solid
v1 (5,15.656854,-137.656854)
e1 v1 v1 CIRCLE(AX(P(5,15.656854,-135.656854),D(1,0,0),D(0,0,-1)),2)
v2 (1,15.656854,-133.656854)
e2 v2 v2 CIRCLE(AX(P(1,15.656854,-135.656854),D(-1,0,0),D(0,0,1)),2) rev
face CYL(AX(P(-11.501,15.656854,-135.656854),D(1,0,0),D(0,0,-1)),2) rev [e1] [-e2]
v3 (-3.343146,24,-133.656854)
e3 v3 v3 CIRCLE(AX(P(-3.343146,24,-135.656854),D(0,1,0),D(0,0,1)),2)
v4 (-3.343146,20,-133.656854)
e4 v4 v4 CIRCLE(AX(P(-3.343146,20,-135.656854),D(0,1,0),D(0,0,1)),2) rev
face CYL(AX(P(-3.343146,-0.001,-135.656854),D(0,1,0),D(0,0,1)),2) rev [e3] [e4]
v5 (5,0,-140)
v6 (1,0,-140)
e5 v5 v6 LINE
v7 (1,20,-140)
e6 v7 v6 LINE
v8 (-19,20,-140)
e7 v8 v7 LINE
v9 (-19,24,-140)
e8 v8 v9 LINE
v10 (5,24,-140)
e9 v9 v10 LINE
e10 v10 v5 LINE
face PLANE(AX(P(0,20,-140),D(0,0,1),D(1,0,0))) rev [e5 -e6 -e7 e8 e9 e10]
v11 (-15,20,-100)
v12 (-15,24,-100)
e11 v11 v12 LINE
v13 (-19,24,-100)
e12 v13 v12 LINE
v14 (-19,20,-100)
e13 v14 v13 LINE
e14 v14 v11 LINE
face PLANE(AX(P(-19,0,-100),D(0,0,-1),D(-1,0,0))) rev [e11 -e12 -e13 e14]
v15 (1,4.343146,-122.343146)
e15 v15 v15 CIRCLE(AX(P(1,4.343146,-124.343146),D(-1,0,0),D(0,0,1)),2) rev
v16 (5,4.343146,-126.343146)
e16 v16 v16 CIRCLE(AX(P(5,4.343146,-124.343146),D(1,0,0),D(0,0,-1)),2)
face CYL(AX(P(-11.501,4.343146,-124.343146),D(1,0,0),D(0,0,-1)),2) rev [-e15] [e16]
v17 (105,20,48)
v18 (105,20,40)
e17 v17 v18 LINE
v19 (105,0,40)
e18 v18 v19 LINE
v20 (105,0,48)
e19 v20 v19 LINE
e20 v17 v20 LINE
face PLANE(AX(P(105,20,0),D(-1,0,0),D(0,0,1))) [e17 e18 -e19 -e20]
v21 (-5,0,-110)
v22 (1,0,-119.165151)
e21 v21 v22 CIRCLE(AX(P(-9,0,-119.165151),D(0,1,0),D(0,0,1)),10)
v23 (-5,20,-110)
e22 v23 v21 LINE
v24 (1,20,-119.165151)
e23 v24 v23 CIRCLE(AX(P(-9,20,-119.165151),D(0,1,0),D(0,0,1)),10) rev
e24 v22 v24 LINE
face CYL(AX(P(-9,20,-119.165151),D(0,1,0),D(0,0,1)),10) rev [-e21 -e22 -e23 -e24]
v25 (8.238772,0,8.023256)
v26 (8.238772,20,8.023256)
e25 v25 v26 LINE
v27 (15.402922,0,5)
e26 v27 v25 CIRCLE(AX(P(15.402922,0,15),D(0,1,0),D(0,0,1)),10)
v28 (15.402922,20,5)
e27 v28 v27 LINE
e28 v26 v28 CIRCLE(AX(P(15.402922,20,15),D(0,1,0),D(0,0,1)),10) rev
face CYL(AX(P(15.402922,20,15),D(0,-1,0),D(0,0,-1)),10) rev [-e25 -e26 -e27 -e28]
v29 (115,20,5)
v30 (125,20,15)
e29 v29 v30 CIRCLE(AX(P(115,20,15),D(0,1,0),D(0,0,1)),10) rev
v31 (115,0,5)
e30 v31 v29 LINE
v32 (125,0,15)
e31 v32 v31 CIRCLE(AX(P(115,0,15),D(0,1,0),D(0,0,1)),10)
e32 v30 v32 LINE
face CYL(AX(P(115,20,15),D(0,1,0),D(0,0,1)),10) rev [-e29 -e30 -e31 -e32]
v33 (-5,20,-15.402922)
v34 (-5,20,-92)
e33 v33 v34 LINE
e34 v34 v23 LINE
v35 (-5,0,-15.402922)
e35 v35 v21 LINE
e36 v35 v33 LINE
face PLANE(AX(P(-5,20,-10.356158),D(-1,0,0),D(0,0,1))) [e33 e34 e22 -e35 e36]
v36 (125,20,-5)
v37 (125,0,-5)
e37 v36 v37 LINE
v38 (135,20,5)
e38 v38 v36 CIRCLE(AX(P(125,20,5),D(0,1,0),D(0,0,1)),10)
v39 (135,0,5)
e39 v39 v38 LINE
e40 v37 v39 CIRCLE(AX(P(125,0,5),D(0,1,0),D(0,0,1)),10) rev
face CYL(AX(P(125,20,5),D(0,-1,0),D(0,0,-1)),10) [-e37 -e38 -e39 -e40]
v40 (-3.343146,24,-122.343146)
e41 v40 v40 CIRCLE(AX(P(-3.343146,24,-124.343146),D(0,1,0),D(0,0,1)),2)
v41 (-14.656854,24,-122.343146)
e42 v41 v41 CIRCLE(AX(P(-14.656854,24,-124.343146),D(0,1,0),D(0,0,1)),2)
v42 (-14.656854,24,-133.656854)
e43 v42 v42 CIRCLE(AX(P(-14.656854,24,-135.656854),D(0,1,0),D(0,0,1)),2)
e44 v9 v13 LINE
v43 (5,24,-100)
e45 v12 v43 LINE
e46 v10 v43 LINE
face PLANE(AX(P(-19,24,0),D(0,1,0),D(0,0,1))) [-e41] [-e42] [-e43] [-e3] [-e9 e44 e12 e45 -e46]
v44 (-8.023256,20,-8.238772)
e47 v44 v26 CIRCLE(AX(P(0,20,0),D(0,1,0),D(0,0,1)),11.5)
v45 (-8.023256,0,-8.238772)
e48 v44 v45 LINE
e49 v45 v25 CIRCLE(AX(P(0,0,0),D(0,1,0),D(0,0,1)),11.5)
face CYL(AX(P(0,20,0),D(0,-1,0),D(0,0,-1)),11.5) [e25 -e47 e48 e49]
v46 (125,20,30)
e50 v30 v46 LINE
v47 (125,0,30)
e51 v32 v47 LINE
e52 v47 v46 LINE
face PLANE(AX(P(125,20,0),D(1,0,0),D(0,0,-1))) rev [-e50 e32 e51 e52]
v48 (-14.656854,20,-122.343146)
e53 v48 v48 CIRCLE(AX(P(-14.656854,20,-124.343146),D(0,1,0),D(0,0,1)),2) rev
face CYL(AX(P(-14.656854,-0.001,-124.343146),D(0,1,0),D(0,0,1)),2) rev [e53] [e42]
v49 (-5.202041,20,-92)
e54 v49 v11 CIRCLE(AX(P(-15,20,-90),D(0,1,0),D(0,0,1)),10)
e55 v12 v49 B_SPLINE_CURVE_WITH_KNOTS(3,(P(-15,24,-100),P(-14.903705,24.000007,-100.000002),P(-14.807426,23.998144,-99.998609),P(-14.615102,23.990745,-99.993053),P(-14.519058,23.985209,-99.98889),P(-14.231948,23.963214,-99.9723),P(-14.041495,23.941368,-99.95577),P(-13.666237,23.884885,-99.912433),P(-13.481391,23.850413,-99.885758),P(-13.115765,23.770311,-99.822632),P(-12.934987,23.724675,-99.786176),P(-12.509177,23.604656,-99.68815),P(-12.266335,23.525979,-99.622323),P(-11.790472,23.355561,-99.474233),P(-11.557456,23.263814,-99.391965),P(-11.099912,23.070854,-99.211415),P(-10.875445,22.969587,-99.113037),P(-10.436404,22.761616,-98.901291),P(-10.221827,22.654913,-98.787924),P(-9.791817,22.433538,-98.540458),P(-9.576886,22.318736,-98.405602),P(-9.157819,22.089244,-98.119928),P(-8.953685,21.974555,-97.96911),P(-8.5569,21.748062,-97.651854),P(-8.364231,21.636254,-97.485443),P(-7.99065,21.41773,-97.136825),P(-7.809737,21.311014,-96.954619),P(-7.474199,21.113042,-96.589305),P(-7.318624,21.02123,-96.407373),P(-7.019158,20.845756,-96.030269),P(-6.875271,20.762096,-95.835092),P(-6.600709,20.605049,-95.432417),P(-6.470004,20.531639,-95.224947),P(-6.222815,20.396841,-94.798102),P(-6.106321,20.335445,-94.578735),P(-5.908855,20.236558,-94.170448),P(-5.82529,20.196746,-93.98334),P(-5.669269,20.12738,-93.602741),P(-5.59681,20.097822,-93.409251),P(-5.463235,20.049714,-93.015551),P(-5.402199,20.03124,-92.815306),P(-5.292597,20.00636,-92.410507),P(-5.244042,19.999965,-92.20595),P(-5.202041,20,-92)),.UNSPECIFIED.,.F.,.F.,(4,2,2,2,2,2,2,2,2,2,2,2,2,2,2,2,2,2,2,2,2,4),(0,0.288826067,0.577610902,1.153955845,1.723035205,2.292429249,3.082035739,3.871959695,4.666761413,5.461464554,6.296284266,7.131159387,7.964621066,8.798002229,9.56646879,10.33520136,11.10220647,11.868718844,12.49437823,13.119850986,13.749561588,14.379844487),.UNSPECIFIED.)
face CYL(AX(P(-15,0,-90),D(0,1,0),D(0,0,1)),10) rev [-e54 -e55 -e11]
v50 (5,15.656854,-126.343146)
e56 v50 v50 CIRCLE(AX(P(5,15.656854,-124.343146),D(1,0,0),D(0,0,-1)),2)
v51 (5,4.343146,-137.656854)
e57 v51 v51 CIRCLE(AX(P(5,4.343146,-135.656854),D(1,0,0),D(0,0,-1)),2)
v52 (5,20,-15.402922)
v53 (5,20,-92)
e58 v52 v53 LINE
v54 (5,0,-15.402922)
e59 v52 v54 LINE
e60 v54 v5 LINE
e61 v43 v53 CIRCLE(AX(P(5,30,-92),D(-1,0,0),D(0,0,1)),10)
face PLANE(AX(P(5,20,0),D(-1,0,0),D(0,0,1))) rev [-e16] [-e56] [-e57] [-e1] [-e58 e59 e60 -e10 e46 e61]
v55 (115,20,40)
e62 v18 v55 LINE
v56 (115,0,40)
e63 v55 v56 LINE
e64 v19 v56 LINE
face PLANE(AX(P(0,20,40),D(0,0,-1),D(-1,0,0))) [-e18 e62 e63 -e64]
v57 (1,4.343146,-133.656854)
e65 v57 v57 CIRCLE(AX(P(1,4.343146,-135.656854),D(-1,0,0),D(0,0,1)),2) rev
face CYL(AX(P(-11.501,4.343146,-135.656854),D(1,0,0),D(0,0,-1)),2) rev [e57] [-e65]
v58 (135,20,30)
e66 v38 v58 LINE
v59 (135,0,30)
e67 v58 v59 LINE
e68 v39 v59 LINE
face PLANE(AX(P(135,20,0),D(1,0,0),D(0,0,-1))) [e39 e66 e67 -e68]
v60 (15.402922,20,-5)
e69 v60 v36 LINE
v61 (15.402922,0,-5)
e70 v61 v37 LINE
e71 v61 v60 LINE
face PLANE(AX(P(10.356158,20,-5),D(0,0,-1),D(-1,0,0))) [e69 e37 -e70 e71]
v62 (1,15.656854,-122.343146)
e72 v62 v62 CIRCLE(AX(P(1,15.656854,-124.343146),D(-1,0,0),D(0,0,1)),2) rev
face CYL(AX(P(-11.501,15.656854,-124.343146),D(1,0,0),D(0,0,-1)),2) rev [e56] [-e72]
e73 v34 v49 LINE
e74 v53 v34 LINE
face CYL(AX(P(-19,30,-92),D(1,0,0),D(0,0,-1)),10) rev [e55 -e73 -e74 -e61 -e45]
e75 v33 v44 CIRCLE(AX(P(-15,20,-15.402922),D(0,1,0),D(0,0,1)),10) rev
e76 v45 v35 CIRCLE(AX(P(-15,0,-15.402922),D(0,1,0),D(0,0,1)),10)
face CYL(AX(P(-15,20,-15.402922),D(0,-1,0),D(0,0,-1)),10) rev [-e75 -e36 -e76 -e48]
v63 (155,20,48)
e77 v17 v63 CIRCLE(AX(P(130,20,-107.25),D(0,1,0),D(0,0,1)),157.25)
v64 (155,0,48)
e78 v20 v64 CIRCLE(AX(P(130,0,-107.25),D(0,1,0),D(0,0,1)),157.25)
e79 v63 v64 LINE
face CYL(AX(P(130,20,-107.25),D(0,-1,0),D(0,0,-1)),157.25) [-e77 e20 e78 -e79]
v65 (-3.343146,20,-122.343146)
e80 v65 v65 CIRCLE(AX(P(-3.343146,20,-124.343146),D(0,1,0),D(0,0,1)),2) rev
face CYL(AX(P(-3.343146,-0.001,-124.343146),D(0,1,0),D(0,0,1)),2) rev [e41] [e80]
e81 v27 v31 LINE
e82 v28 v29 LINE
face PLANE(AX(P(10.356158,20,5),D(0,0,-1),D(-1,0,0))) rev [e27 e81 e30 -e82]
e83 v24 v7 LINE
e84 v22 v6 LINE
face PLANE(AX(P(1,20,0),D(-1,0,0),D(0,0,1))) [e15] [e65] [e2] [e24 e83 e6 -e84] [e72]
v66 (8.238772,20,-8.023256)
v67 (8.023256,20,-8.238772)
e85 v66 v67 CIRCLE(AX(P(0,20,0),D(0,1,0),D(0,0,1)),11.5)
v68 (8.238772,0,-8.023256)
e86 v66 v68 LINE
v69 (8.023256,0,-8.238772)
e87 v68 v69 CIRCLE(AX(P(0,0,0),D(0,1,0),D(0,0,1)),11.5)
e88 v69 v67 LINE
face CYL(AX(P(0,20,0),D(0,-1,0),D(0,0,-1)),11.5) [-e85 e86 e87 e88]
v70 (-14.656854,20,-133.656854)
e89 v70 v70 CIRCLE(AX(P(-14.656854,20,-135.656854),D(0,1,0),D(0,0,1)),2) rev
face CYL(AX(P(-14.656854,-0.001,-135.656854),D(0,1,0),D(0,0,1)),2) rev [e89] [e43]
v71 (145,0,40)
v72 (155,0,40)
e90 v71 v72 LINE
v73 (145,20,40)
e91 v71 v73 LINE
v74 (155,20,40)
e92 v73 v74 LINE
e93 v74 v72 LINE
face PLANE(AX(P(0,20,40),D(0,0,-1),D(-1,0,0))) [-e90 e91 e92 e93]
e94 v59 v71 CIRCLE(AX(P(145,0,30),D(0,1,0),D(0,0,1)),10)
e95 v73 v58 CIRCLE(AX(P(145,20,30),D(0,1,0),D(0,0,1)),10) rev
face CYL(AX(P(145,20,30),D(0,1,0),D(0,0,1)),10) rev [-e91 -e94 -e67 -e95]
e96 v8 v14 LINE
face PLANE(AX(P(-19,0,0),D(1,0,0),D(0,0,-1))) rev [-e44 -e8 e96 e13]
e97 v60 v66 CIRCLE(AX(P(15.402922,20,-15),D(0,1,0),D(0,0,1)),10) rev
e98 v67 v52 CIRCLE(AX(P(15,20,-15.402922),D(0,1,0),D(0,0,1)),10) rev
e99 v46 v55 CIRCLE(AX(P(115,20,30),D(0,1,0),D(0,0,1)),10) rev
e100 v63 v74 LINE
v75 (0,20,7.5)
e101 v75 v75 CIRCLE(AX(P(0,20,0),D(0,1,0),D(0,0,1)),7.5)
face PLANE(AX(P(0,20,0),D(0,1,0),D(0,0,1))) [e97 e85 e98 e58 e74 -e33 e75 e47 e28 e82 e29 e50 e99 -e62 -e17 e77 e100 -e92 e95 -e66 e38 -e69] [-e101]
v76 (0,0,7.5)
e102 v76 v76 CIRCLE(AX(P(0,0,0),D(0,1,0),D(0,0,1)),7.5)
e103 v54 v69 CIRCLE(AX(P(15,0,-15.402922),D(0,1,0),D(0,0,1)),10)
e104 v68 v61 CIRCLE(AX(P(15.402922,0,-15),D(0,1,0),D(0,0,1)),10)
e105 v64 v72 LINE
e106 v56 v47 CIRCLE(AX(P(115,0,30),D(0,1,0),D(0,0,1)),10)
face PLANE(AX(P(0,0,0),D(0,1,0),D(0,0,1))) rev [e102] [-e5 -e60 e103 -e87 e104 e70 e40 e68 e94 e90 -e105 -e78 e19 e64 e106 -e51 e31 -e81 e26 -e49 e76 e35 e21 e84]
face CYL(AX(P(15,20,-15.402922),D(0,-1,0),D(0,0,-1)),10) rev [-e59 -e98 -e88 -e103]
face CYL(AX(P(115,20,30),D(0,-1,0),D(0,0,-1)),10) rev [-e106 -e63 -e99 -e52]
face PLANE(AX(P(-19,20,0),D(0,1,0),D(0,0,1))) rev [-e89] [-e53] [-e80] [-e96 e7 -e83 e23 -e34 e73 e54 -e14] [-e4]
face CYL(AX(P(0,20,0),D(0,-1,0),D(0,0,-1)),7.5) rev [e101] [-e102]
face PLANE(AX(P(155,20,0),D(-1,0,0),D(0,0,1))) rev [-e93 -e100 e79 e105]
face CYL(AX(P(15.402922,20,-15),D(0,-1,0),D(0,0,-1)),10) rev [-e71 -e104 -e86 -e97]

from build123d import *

# Parameters (mm, degrees)
SKETCH1_R           = 7.5
BOSS_EXTRUDE1_DEPTH = 20
CUT_EXTRUDE1_REACH  = 208.155
SKETCH2_R           = 2
FILLET1_R           = 10
SKETCH3_W           = 40
SKETCH3_H           = 4
BOSS_EXTRUDE2_DEPTH = 24
CUT_EXTRUDE2_REACH  = 212.24
SKETCH4_R           = 2
FILLET3_R           = 10
FILLET4_START       = -5.202040929
FILLET4_DEPTH       = 6.202040929
FILLET4_START_2     = -14.898418687
FILLET4_2_DEPTH     = 9.696377758
FILLET4_START_3     = 20
FILLET4_3_DEPTH     = 5


with BuildPart() as part:
    # Sketch1 → Boss-Extrude1 (new body)
    with BuildSketch(Plane(origin=(0, 0, 0), x_dir=(1, 0, 0), z_dir=(0, 1, 0))):
        with BuildLine():
            Line((10.356157589, -5), (125, -5))
            Line((125, -5), (125, -40))
            Line((125, -40), (105, -40))
            Line((105, -40), (105, -48))
            ThreePointArc((105, -48), (130, -50), (155, -48))
            Line((155, -48), (155, -40))
            Line((155, -40), (135, -40))
            Line((135, -40), (135, 5))
            Line((135, 5), (10.356157589, 5))
            ThreePointArc((10.356157589, 5), (8.131727984, 8.131727984), (5, 10.356157589))
            Line((5, 10.356157589), (5, 140))
            Line((5, 140), (1, 140))
            Line((1, 140), (1, 110))
            Line((1, 110), (-5, 110))
            Line((-5, 110), (-5, 10.356157589))
            ThreePointArc((-5, 10.356157589), (-8.131727984, -8.131727984), (10.356157589, -5))
        make_face()
        with Locations(Location((0, 0, 0), (0, 0, 270))):
            Circle(SKETCH1_R, mode=Mode.SUBTRACT)
    extrude(amount=BOSS_EXTRUDE1_DEPTH)

    # Sketch2 → Cut-Extrude1 (cut, up to next)
    with BuildSketch(Plane(origin=(5, 0, 0), x_dir=(0, 0, -1), z_dir=(1, 0, 0)), mode=Mode.PRIVATE) as cut_extrude1_sk1:
        with Locations((135.656854249, 4.343145751)):
            Circle(SKETCH2_R)
    cut_extrude1_tool1 = extrude(cut_extrude1_sk1.sketch, amount=-CUT_EXTRUDE1_REACH, mode=Mode.PRIVATE) & part.part
    # Sketch2 → Cut-Extrude1 (cut, up to next)
    with BuildSketch(Plane(origin=(5, 0, 0), x_dir=(0, 0, -1), z_dir=(1, 0, 0)), mode=Mode.PRIVATE) as cut_extrude1_sk2:
        with Locations((124.343145751, 4.343145751)):
            Circle(SKETCH2_R)
    cut_extrude1_tool2 = extrude(cut_extrude1_sk2.sketch, amount=-CUT_EXTRUDE1_REACH, mode=Mode.PRIVATE) & part.part
    # Sketch2 → Cut-Extrude1 (cut, up to next)
    with BuildSketch(Plane(origin=(5, 0, 0), x_dir=(0, 0, -1), z_dir=(1, 0, 0)), mode=Mode.PRIVATE) as cut_extrude1_sk3:
        with Locations((124.343145751, 15.656854249)):
            Circle(SKETCH2_R)
    cut_extrude1_tool3 = extrude(cut_extrude1_sk3.sketch, amount=-CUT_EXTRUDE1_REACH, mode=Mode.PRIVATE) & part.part
    # Sketch2 → Cut-Extrude1 (cut, up to next)
    with BuildSketch(Plane(origin=(5, 0, 0), x_dir=(0, 0, -1), z_dir=(1, 0, 0)), mode=Mode.PRIVATE) as cut_extrude1_sk4:
        with Locations((135.656854249, 15.656854249)):
            Circle(SKETCH2_R)
    cut_extrude1_tool4 = extrude(cut_extrude1_sk4.sketch, amount=-CUT_EXTRUDE1_REACH, mode=Mode.PRIVATE) & part.part
    add(cut_extrude1_tool1.solids().sort_by_distance((5, 4.343146, -135.656854))[0], mode=Mode.SUBTRACT)
    add(cut_extrude1_tool2.solids().sort_by_distance((5, 4.343146, -124.343146))[0], mode=Mode.SUBTRACT)
    add(cut_extrude1_tool3.solids().sort_by_distance((5, 15.656854, -124.343146))[0], mode=Mode.SUBTRACT)
    add(cut_extrude1_tool4.solids().sort_by_distance((5, 15.656854, -135.656854))[0], mode=Mode.SUBTRACT)

    # Fillet1
    # the kernel refuses this fillet: 10 mm, written as the material it adds along each edge
    with BuildSketch(Plane(origin=(1, 0, -110), x_dir=(0, 0, -1), z_dir=(0, 1, 0))) as fillet1_piece_1:
        with BuildLine():
            CenterArc((9.16515139, 10), FILLET1_R, 203.578178478, 66.421821522)
            Line((0, 6), (0, 0))
            Line((0, 0), (9.16515139, 0))
        make_face()
    extrude(amount=20)
    with BuildSketch(Plane(origin=(125, 0, 40), x_dir=(0, 0, -1), z_dir=(0, 1, 0)), Plane(origin=(135, 0, 40), x_dir=(1, 0, 0), z_dir=(0, 1, 0)), Plane(origin=(125, 0, 5), x_dir=(-1, 0, 0), z_dir=(0, 1, 0))) as fillet1_piece_2:
        with BuildLine():
            CenterArc((FILLET1_R, FILLET1_R), FILLET1_R, 180, 90)
            Line((0, FILLET1_R), (0, 0))
            Line((0, 0), (FILLET1_R, 0))
        make_face()
    extrude(amount=20)
    with BuildSketch(Plane(origin=(10.356157589, 0, 5), x_dir=(1, 0, 0), z_dir=(0, 1, 0))) as fillet1_piece_3:
        with BuildLine():
            CenterArc((5.046764212, -10), FILLET1_R, 90, 45.75928121)
            ThreePointArc((-2.117385463, -3.023255814), (-0.936610269, -1.597130308), (0, 0))
            Line((0, 0), (5.046764212, 0))
        make_face()
    extrude(amount=20)
    with BuildSketch(Plane(origin=(10.356157589, 0, -5), x_dir=(1, 0, 0), z_dir=(0, 1, 0))) as fillet1_piece_4:
        with BuildLine():
            CenterArc((5.046764212, 10), FILLET1_R, 224.24071879, 45.75928121)
            ThreePointArc((-2.117385463, 3.023255814), (-0.936610269, 1.597130308), (0, 0))
            Line((0, 0), (5.046764212, 0))
        make_face()
    extrude(amount=20)
    with BuildSketch(Plane(origin=(5, 0, -10.356157589), x_dir=(0.8190910712491061, 0, 0.5736635050271124), z_dir=(0, 1, 0))) as fillet1_piece_5:
        with BuildLine():
            CenterArc((5.295766266, 9.870394555), FILLET1_R, 215.006090265, 45.75928121)
            Line((-2.895144447, 4.133759505), (0, 0))
            ThreePointArc((0, 0), (1.845494305, 0.149046262), (3.690988609, 0))
        make_face()
    extrude(amount=20)
    with BuildSketch(Plane(origin=(-5, 0, -10.356157589), x_dir=(-0.8190910712491065, 0, 0.5736635050271119), z_dir=(0, 1, 0))) as fillet1_piece_6:
        with BuildLine():
            CenterArc((5.295766266, -9.870394555), FILLET1_R, 99.234628525, 45.75928121)
            Line((-2.895144447, -4.133759505), (0, 0))
            ThreePointArc((0, 0), (1.845494305, -0.149046262), (3.690988609, 0))
        make_face()
    extrude(amount=20)
    # the kernel refuses this fillet: 10 mm, written as the material it takes off along each edge
    with BuildSketch(Plane(origin=(135, -25, -5), x_dir=(0, 0, 1), z_dir=(0, 1, 0))) as fillet1_2_piece_1:
        with BuildLine():
            CenterArc((FILLET1_R, -FILLET1_R), FILLET1_R, 90, 90)
            Line((0, -FILLET1_R), (0, 0))
            Line((0, 0), (FILLET1_R, 0))
        make_face()
    extrude(amount=70, mode=Mode.SUBTRACT)

    # Sketch3 → Boss-Extrude2 (add)
    with BuildSketch(Plane(origin=(5, 0, 0), x_dir=(0, 0, -1), z_dir=(1, 0, 0))):
        with Locations((120, 22)):
            Rectangle(SKETCH3_W, SKETCH3_H)
    extrude(amount=-BOSS_EXTRUDE2_DEPTH)

    # Sketch4 → Cut-Extrude2 (cut, up to next)
    with BuildSketch(Plane(origin=(0, 24, 0), x_dir=(1, 0, 0), z_dir=(0, 1, 0)), mode=Mode.PRIVATE) as cut_extrude2_sk1:
        with Locations(Location((-3.343145751, 135.656854249, 0), (0, 0, 270))):
            Circle(SKETCH4_R)
    cut_extrude2_tool1 = extrude(cut_extrude2_sk1.sketch, amount=-CUT_EXTRUDE2_REACH, mode=Mode.PRIVATE) & part.part
    # Sketch4 → Cut-Extrude2 (cut, up to next)
    with BuildSketch(Plane(origin=(0, 24, 0), x_dir=(1, 0, 0), z_dir=(0, 1, 0)), mode=Mode.PRIVATE) as cut_extrude2_sk2:
        with Locations(Location((-14.656854249, 135.656854249, 0), (0, 0, 270))):
            Circle(SKETCH4_R)
    cut_extrude2_tool2 = extrude(cut_extrude2_sk2.sketch, amount=-CUT_EXTRUDE2_REACH, mode=Mode.PRIVATE) & part.part
    # Sketch4 → Cut-Extrude2 (cut, up to next)
    with BuildSketch(Plane(origin=(0, 24, 0), x_dir=(1, 0, 0), z_dir=(0, 1, 0)), mode=Mode.PRIVATE) as cut_extrude2_sk3:
        with Locations(Location((-14.656854249, 124.343145751, 0), (0, 0, 270))):
            Circle(SKETCH4_R)
    cut_extrude2_tool3 = extrude(cut_extrude2_sk3.sketch, amount=-CUT_EXTRUDE2_REACH, mode=Mode.PRIVATE) & part.part
    # Sketch4 → Cut-Extrude2 (cut, up to next)
    with BuildSketch(Plane(origin=(0, 24, 0), x_dir=(1, 0, 0), z_dir=(0, 1, 0)), mode=Mode.PRIVATE) as cut_extrude2_sk4:
        with Locations(Location((-3.343145751, 124.343145751, 0), (0, 0, 270))):
            Circle(SKETCH4_R)
    cut_extrude2_tool4 = extrude(cut_extrude2_sk4.sketch, amount=-CUT_EXTRUDE2_REACH, mode=Mode.PRIVATE) & part.part
    add(cut_extrude2_tool1.solids().sort_by_distance((-3.343146, 24, -135.656854))[0], mode=Mode.SUBTRACT)
    add(cut_extrude2_tool2.solids().sort_by_distance((-14.656854, 24, -135.656854))[0], mode=Mode.SUBTRACT)
    add(cut_extrude2_tool3.solids().sort_by_distance((-14.656854, 24, -124.343146))[0], mode=Mode.SUBTRACT)
    add(cut_extrude2_tool4.solids().sort_by_distance((-3.343146, 24, -124.343146))[0], mode=Mode.SUBTRACT)

    # Fillet3
    # the kernel refuses this fillet: 10 mm, written as the material it adds along each edge
    with BuildSketch(Plane(origin=(5, 20, -100), x_dir=(0, 0, 1), z_dir=(-1, 0, 0))) as fillet3_piece_1:
        with BuildLine():
            CenterArc((8, 10), FILLET3_R, 216.869897646, 53.130102354)
            Line((0, 4), (0, 0))
            Line((0, 0), (8, 0))
        make_face()
    extrude(amount=10)

    # Fillet4: read off the stored shape, not the designer's step
    # Fillet4 outline → Fillet4 (add)
    with BuildSketch(Plane.YZ.offset(FILLET4_START)):
        with BuildLine():
            Line((20, -92), (20, -100))
            Line((20, -100), (24.000002869, -100.000002152))
            ThreePointArc((24.000002869, -100.000002152), (21.055728892, -96.472137559), (20, -92))
        make_face()
    extrude(amount=FILLET4_DEPTH)

    # Fillet4 2 outline → Fillet4 2 (add)
    with BuildSketch(Plane.YZ.offset(FILLET4_START_2)):
        with BuildLine():
            ThreePointArc((24.000002869, -100.000002152), (21.055728892, -96.472137559), (20, -92))
            Line((20, -92), (20, -100))
            Line((20, -100), (24.000002869, -100.000002152))
        make_face()
    extrude(amount=FILLET4_2_DEPTH)

    # Fillet4 3 outline → Fillet4 3 (cut)
    with BuildSketch(Plane(origin=(0, 0, 0), x_dir=(1, 0, 0), z_dir=(0, 1, 0)).offset(FILLET4_START_3)):
        with BuildLine():
            Line((-4.793792738, 90), (-5.202041029, 92))
            ThreePointArc((-5.202041029, 92), (-8.636183479, 97.713743532), (-14.898418687, 99.999484049))
            Line((-14.898418687, 99.999484049), (-14.898418687, 90))
            Line((-14.898418687, 90), (-4.793792738, 90))
        make_face()
    extrude(amount=FILLET4_3_DEPTH, mode=Mode.SUBTRACT)


solid = part.part
